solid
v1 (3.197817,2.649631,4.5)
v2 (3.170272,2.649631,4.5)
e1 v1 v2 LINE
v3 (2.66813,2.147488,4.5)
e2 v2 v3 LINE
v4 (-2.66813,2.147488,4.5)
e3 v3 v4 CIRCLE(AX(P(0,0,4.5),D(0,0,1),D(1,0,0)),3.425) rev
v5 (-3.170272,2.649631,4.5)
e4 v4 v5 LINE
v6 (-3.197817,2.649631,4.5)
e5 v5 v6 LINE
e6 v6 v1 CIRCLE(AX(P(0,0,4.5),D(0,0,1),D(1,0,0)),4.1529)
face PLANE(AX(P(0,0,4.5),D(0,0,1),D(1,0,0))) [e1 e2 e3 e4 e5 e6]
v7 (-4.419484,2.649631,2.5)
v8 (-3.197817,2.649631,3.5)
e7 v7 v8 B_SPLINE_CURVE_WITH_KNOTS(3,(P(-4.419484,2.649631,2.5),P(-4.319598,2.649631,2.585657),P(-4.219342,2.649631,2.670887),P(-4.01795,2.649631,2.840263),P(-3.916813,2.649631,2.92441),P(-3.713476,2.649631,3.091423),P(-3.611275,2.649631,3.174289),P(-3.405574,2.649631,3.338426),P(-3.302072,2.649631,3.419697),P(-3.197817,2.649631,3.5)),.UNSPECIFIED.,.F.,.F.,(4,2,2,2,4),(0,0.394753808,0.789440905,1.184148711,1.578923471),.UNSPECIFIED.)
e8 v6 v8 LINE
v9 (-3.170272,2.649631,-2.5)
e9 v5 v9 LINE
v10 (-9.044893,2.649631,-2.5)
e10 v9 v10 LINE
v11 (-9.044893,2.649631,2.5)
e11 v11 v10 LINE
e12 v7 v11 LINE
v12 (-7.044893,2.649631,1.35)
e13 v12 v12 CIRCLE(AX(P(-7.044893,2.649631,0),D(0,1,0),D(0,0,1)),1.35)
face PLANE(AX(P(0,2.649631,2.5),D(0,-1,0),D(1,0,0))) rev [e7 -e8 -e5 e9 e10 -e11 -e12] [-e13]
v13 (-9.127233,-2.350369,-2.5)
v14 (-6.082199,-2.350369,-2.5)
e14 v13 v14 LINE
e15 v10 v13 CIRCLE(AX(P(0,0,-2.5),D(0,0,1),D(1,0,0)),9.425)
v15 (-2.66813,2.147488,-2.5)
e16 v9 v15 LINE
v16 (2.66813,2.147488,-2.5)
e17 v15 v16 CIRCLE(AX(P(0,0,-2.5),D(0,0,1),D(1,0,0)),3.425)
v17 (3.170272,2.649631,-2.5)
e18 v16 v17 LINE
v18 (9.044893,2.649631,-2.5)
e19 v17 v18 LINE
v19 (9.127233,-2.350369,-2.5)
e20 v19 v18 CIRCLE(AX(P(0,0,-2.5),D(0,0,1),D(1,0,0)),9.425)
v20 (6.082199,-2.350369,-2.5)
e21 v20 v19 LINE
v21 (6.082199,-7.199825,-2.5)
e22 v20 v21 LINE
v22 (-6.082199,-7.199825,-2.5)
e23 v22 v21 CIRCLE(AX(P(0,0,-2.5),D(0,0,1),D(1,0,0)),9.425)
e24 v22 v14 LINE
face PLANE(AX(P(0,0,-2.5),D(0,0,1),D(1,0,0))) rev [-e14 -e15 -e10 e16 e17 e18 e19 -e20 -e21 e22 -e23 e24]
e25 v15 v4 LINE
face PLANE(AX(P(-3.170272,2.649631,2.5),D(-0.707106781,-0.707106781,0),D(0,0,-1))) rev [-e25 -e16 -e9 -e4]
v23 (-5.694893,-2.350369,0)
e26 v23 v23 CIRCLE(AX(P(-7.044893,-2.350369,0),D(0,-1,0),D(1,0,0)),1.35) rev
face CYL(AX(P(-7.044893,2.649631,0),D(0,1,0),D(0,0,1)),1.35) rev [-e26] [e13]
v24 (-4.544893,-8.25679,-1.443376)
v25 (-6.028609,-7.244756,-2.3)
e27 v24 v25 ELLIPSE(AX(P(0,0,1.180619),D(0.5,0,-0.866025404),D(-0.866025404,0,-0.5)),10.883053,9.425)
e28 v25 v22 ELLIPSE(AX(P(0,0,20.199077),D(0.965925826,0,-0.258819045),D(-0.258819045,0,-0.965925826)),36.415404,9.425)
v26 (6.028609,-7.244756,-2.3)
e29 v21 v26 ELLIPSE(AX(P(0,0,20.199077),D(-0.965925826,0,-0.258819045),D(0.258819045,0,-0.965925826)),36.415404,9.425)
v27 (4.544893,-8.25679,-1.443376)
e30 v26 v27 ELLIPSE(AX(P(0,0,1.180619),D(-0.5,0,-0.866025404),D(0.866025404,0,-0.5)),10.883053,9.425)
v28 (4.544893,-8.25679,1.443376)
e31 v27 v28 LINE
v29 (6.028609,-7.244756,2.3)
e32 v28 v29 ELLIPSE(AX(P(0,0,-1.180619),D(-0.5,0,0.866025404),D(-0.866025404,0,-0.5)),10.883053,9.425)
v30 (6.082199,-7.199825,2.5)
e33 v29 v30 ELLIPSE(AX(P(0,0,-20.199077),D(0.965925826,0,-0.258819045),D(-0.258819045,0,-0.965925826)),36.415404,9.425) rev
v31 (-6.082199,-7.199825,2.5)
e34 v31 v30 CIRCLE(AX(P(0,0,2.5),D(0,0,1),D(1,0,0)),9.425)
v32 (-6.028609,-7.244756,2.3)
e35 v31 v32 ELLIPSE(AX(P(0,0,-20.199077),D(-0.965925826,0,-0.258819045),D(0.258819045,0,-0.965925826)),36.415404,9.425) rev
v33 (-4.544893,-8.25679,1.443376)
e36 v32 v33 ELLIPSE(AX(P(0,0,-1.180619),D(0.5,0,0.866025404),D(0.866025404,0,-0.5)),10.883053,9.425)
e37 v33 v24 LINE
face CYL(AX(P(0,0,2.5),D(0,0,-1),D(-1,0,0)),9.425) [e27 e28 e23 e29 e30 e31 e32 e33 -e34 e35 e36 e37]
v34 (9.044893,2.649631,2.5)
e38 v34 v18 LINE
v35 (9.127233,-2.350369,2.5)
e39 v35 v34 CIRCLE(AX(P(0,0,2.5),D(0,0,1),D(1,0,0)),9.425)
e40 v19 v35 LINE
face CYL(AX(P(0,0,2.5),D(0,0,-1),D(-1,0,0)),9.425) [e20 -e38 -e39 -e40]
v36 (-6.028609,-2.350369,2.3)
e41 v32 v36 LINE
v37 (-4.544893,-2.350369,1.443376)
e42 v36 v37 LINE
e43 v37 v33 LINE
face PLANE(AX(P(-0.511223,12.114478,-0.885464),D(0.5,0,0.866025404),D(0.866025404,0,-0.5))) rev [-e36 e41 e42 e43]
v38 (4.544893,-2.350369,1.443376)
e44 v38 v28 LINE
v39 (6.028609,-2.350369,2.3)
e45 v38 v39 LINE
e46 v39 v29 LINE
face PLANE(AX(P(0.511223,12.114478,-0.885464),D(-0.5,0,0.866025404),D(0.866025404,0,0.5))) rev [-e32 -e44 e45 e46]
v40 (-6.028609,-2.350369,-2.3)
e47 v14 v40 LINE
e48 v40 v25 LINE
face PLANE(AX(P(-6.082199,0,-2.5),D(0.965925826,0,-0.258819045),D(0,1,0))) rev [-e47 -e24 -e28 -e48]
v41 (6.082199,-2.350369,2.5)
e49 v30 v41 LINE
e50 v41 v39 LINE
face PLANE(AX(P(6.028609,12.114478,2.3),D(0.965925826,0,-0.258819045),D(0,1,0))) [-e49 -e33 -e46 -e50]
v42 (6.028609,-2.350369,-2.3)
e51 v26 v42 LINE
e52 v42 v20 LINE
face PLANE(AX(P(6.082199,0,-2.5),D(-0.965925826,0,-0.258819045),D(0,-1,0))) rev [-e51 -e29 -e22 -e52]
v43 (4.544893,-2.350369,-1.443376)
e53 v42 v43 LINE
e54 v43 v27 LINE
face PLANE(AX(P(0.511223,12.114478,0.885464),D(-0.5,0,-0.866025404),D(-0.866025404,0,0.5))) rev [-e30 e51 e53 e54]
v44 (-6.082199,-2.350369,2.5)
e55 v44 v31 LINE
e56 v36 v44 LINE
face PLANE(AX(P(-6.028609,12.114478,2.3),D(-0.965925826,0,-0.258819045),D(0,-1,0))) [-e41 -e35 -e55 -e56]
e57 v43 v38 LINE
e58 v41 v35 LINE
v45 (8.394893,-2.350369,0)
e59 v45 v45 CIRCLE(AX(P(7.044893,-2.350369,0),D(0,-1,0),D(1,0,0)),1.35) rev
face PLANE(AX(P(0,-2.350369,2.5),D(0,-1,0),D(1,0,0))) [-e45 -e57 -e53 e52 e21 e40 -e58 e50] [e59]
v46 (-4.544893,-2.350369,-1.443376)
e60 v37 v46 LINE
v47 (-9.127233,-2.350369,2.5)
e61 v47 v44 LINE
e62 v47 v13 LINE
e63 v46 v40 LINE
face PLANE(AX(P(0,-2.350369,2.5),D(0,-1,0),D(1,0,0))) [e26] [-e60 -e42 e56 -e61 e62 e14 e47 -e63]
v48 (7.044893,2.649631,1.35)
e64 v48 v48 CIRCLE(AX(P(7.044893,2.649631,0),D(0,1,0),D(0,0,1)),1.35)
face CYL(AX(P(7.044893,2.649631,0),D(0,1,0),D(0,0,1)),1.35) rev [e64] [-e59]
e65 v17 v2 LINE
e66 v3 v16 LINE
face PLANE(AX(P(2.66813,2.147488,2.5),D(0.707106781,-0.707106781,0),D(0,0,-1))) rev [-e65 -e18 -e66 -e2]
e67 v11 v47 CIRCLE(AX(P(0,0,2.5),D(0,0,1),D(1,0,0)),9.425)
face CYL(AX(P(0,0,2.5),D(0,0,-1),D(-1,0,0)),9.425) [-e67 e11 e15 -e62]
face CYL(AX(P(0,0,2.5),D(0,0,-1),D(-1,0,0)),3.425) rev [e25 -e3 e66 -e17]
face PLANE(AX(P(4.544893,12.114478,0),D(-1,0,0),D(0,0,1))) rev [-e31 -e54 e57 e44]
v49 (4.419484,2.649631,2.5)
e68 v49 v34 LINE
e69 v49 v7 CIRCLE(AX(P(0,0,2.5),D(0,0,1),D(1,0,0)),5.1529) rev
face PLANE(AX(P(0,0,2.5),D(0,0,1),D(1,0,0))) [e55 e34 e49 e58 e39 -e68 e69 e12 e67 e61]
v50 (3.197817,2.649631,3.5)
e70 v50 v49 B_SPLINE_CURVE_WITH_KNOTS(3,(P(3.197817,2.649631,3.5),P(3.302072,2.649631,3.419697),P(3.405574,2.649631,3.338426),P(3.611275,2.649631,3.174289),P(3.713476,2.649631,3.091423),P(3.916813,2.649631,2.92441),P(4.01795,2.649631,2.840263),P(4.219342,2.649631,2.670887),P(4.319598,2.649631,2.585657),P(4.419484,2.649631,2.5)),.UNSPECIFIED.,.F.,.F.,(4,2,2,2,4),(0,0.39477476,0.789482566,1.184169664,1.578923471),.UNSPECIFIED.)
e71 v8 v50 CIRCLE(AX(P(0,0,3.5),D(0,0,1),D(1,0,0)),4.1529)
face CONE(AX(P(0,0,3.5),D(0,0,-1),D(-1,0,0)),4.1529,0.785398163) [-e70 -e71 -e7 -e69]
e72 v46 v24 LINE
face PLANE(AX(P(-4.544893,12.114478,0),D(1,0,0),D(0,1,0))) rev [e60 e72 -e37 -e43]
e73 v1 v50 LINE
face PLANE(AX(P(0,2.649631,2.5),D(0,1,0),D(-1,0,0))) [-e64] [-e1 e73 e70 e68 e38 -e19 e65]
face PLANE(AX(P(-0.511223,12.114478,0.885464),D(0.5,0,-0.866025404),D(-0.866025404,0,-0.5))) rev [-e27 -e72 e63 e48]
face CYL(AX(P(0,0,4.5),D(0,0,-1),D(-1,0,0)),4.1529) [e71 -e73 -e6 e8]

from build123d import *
from OCP.BRepFilletAPI import BRepFilletAPI_MakeChamfer

# Parameters (mm, degrees)
BOSS_EXTRUDE1_DEPTH    = 2.5
BOSS_EXTRUDE2_START    = 2
BOSS_EXTRUDE2_DEPTH    = 2
CHAMFER1_SIZE          = 1
CHAMFER2_SIZE          = 1
M2_5_CLEARANCE_HOLE1_D = 2.7
CUT_EXTRUDE1_DEPTH     = 7.074630657
CHAMFER3_SIZE          = 0.4
CHAMFER3_SIZE2         = 0.292820323
CHAMFER4_SIZE          = 0.4
CHAMFER4_SIZE2         = 0.292820323
CHAMFER5_SIZE          = 1


with BuildPart() as part:
    # Sketch1 → Boss-Extrude1 (new, symmetric)
    with BuildSketch(Plane.XY):
        with BuildLine():
            Line((9.044892613, 2.649630657), (2.170272421, 2.649630657))
            ThreePointArc((2.170272421, 2.649630657), (3.095465073, 1.465851622), (3.425, 0))
            ThreePointArc((3.425, 0), (-1.465851622, -3.095465073), (-2.170272421, 2.649630657))
            Line((-2.170272421, 2.649630657), (-9.044892613, 2.649630657))
            ThreePointArc((-9.044892613, 2.649630657), (0, -9.425), (9.044892613, 2.649630657))
        make_face()
    extrude(amount=BOSS_EXTRUDE1_DEPTH, both=True)

    # Sketch2 → Boss-Extrude2 (add)
    with BuildSketch(Plane.XY.offset(2.5).offset(BOSS_EXTRUDE2_START)):
        with BuildLine():
            ThreePointArc((4.1529, 0), (3.906839776, 1.408254726), (3.197817348, 2.649630657))
            Line((3.197817348, 2.649630657), (2.170272421, 2.649630657))
            ThreePointArc((2.170272421, 2.649630657), (0, -3.425), (-2.170272421, 2.649630657))
            Line((-2.170272421, 2.649630657), (-3.197817348, 2.649630657))
            ThreePointArc((-3.197817348, 2.649630657), (-1.408254726, -3.906839776), (4.1529, 0))
        make_face()
    extrude(amount=-BOSS_EXTRUDE2_DEPTH)

    # Chamfer1
    # the kernel refuses this chamfer: 1, 0.710595202 mm, written as the material it takes off along each edge
    with BuildSketch(Plane(origin=(-2.170272421, 2.649630657, -5.071682988), x_dir=(-1, 0, 0), z_dir=(0, 0, 1))) as chamfer1_piece_1:
        with BuildLine():
            Line((CHAMFER1_SIZE, 0), (0.497857743, 0.502142257))
            ThreePointArc((0.497857743, 0.502142257), (0.261983404, 0.238250015), (0, 0))
            Line((0, 0), (CHAMFER1_SIZE, 0))
        make_face()
    extrude(amount=12.143365976, mode=Mode.SUBTRACT)

    # Chamfer2
    # the kernel refuses this chamfer: 1, 0.710595202 mm, written as the material it takes off along each edge
    with BuildSketch(Plane(origin=(2.170272421, 2.649630657, -5.071682988), x_dir=(1, 0, 0), z_dir=(0, 0, 1))) as chamfer2_piece_1:
        with BuildLine():
            Line((CHAMFER2_SIZE, 0), (0.497857743, -0.502142257))
            ThreePointArc((0.497857743, -0.502142257), (0.261983404, -0.238250015), (0, 0))
            Line((0, 0), (CHAMFER2_SIZE, 0))
        make_face()
    extrude(amount=12.143365976, mode=Mode.SUBTRACT)

    # M2.5 Clearance Hole1 (through all)
    with Locations(Plane(origin=(0, 2.649630657, 0), x_dir=(1, 0, 0), z_dir=(0, 1, 0))):
        with Locations((-7.044892613, 0), (7.044892613, 0)):
            Hole(M2_5_CLEARANCE_HOLE1_D / 2)

    # Sketch5 → Cut-Extrude1 (cut)
    with BuildSketch(Plane(origin=(0, -9.425, 0), x_dir=(-1, 0, 0), z_dir=(0, -1, 0))):
        Polygon((-12.044892613, 2.886751346), (-12.044892613, -2.886751346), (-7.044892613, -2.886751346), (-9.544892613, -1.443375673), (-9.544892613, 1.443375673), (-7.044892613, 2.886751346), align=None)
        Polygon((-4.544892613, 1.443375673), (-7.044892613, 2.886751346), (-9.544892613, 1.443375673), (-9.544892613, -1.443375673), (-7.044892613, -2.886751346), (-4.544892613, -1.443375673), align=None)
        Polygon((4.544892613, -1.443375673), (7.044892613, -2.886751346), (9.544892613, -1.443375673), (9.544892613, 1.443375673), (7.044892613, 2.886751346), (4.544892613, 1.443375673), align=None)
        Polygon((12.044892613, -2.886751346), (7.044892613, -2.886751346), (9.544892613, -1.443375673), (9.544892613, 1.443375673), (7.044892613, 2.886751346), (12.044892613, 2.886751346), align=None)
    extrude(amount=-CUT_EXTRUDE1_DEPTH, mode=Mode.SUBTRACT)

    # Chamfer3: one chamfer whose edges measure the first distance from different faces: ONE call of the kernel's chamfer builder (chamfer() names one face for all edges)
    chamfer3_edges_1 = [part.edges().sort_by_distance(p)[0] for p in [
        (6.375019632, -4.646126535, 2.5),
    ]]
    chamfer3_side_1 = [part.faces().sort_by_distance(p)[0] for p in [
        (5.422316201, -5.016137367, 1.949956418),
    ]]
    chamfer3_edges_2 = [part.edges().sort_by_distance(p)[0] for p in [
        (-6.375019632, -4.646126535, 2.5),
    ]]
    chamfer3_side_2 = [part.faces().sort_by_distance(p)[0] for p in [
        (-5.422316201, -5.016137367, 1.949956418),
    ]]
    chamfer3 = BRepFilletAPI_MakeChamfer(part.part.solid().wrapped)
    for e in chamfer3_edges_1:
        chamfer3.Add(CHAMFER3_SIZE, CHAMFER3_SIZE2, e.wrapped, chamfer3_side_1[0].wrapped)  # the first distance lies on this face
    for e in chamfer3_edges_2:
        chamfer3.Add(CHAMFER3_SIZE, CHAMFER3_SIZE2, e.wrapped, chamfer3_side_2[0].wrapped)  # the first distance lies on this face
    add(Compound.cast(chamfer3.Shape()), mode=Mode.REPLACE)

    # Chamfer4: one chamfer whose edges measure the first distance from different faces: ONE call of the kernel's chamfer builder (chamfer() names one face for all edges)
    chamfer4_edges_1 = [part.edges().sort_by_distance(p)[0] for p in [
        (6.375019632, -4.646126535, -2.5),
    ]]
    chamfer4_side_1 = [part.faces().sort_by_distance(p)[0] for p in [
        (5.422316201, -5.016137367, -1.949956418),
    ]]
    chamfer4_edges_2 = [part.edges().sort_by_distance(p)[0] for p in [
        (-6.375019632, -4.646126535, -2.5),
    ]]
    chamfer4_side_2 = [part.faces().sort_by_distance(p)[0] for p in [
        (-5.422316201, -5.016137367, -1.949956418),
    ]]
    chamfer4 = BRepFilletAPI_MakeChamfer(part.part.solid().wrapped)
    for e in chamfer4_edges_1:
        chamfer4.Add(CHAMFER4_SIZE, CHAMFER4_SIZE2, e.wrapped, chamfer4_side_1[0].wrapped)  # the first distance lies on this face
    for e in chamfer4_edges_2:
        chamfer4.Add(CHAMFER4_SIZE, CHAMFER4_SIZE2, e.wrapped, chamfer4_side_2[0].wrapped)  # the first distance lies on this face
    add(Compound.cast(chamfer4.Shape()), mode=Mode.REPLACE)

    # Chamfer5
    chamfer5_edges = [part.edges().sort_by_distance(p)[0] for p in [
        (-1.408254726, -3.906839776, 2.5),
    ]]
    chamfer(chamfer5_edges, length=CHAMFER5_SIZE)


solid = part.part
